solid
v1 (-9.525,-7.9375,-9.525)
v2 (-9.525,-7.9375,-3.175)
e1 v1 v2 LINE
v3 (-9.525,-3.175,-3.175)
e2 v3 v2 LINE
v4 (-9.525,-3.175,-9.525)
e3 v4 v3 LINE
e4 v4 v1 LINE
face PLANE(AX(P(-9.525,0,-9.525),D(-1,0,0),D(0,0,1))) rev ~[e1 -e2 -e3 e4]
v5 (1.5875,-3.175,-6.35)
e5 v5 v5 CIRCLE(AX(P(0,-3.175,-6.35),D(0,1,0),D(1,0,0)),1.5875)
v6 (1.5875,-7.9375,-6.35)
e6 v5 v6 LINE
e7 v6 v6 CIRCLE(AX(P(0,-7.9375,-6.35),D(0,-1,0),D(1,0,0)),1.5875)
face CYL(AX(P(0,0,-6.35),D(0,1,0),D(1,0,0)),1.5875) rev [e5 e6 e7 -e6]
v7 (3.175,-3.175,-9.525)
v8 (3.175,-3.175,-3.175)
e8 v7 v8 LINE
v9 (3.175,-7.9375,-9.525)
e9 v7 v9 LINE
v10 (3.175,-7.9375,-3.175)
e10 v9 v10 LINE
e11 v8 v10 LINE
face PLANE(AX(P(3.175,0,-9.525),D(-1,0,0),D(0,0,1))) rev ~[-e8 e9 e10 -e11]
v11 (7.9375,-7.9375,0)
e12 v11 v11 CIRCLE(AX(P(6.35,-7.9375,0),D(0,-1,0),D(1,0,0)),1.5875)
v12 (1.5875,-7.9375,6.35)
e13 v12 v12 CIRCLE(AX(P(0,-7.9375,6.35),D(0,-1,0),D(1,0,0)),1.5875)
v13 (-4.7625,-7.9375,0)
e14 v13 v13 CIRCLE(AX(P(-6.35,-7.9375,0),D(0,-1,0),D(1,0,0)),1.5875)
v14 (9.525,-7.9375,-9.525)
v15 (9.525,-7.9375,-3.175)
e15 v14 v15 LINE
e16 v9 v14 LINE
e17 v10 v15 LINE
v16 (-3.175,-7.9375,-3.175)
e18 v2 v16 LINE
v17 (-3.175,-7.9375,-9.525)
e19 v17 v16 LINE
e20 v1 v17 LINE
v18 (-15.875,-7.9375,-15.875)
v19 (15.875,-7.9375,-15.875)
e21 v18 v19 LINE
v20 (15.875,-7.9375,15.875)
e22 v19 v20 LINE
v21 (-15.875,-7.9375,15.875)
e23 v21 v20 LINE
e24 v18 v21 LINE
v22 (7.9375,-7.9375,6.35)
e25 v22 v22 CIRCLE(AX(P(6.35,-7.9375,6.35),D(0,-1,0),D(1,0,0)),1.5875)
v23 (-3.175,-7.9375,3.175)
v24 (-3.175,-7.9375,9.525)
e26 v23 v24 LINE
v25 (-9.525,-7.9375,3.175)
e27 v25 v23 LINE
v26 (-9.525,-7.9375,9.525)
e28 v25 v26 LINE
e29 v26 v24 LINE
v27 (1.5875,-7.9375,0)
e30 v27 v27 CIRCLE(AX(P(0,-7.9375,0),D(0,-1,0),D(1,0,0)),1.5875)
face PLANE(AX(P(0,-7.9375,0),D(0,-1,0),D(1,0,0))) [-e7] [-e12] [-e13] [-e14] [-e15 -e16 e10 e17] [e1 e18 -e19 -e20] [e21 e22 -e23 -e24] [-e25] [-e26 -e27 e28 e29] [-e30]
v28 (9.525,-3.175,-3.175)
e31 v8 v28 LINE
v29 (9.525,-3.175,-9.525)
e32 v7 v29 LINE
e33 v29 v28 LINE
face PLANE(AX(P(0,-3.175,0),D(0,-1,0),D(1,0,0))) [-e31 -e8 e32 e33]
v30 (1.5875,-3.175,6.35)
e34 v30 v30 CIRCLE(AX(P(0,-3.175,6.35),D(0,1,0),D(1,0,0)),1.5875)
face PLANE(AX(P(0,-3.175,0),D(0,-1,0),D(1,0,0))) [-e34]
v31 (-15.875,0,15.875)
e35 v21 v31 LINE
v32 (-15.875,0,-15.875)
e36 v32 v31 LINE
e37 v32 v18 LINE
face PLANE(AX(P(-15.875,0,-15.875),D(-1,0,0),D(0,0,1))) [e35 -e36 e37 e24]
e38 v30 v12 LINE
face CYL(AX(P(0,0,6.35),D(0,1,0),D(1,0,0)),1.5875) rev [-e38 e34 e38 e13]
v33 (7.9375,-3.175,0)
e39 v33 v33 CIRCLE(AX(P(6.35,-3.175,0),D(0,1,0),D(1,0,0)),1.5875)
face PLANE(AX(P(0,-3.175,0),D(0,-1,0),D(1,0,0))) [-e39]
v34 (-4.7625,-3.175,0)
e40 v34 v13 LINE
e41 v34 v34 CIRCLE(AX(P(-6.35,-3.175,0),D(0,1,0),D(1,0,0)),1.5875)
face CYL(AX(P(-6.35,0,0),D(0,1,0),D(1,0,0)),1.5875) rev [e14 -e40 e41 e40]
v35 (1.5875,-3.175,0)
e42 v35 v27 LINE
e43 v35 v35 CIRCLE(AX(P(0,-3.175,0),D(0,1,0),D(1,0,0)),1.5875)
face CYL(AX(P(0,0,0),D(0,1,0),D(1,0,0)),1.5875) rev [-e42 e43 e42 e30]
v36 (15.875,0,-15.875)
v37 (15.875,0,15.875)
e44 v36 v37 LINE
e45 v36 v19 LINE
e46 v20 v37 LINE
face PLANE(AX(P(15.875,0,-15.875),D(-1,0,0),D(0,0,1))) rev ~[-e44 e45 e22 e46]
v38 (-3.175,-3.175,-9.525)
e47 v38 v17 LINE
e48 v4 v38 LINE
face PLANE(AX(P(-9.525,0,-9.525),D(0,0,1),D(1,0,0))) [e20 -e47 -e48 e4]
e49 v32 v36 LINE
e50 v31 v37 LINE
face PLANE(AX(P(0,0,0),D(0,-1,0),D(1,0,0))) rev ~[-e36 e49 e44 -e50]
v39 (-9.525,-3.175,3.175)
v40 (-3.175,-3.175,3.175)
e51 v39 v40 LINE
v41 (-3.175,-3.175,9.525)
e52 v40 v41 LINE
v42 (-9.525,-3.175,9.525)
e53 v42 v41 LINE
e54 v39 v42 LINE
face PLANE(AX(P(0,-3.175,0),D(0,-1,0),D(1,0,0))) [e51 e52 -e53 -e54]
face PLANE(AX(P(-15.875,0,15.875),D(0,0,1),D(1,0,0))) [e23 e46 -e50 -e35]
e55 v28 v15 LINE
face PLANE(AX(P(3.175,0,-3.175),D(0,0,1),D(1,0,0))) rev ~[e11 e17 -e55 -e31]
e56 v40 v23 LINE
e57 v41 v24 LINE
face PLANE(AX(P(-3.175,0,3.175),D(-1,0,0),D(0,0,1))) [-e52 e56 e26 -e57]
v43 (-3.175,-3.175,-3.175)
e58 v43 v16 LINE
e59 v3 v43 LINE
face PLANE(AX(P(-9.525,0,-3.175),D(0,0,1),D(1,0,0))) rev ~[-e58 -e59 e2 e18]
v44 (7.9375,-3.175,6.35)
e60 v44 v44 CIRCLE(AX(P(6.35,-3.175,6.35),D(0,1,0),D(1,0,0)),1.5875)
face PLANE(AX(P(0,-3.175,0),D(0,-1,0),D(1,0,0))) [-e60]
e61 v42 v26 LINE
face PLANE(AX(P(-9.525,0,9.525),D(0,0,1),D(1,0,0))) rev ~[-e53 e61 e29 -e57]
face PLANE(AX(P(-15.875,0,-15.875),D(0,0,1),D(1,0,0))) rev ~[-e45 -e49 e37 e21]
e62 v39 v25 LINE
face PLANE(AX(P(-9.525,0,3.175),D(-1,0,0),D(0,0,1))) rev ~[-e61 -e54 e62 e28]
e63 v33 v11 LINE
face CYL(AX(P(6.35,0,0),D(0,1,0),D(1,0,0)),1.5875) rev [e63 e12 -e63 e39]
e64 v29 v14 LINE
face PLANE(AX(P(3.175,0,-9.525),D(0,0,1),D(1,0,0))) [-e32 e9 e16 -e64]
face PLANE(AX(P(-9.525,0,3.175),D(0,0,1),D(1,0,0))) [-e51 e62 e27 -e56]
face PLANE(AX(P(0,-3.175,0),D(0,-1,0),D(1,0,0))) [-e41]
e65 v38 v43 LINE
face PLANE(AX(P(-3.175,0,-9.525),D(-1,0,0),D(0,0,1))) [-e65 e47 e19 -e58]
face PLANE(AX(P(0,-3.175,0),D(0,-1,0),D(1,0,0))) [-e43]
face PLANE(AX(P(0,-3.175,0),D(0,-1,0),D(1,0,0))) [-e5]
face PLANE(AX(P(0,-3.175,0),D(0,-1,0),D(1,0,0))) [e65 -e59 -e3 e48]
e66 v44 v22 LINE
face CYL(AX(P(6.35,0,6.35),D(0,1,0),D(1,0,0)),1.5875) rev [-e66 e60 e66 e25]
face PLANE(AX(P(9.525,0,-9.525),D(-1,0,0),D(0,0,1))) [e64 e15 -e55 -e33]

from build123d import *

# Parameters (mm, degrees)
F0_W     = 31.75
F0_H     = 31.75
F0_W_2   = 6.35
F0_H_2   = 6.35
F0_R     = 1.5875
F1_DEPTH = 7.9375
F2_DEPTH = 3.175


# Not quite as in the source:
# - a length typed as a fraction of an inch, garbled in the dataset ("3 / 203.2 mm" for 3/8 in), is restored


with BuildPart() as f1:
    # F0 (on Front) → F1 (new body)
    with BuildSketch(Plane.XZ):
        Rectangle(F0_W, F0_H)
        with Locations((-6.35, -6.35)):
            Rectangle(F0_W_2, F0_H_2, mode=Mode.SUBTRACT)
        with Locations((0, -6.35)):
            Circle(F0_R, mode=Mode.SUBTRACT)
        with Locations((6.35, -6.35)):
            Rectangle(F0_W_2, F0_H_2, mode=Mode.SUBTRACT)
        with Locations((-6.35, 0)):
            Circle(F0_R, mode=Mode.SUBTRACT)
        with Locations((-6.35, 6.35)):
            Rectangle(F0_W_2, F0_H_2, mode=Mode.SUBTRACT)
        Circle(F0_R, mode=Mode.SUBTRACT)
        with Locations((6.35, 0)):
            Circle(F0_R, mode=Mode.SUBTRACT)
        with Locations((0, 6.35)):
            Circle(F0_R, mode=Mode.SUBTRACT)
        with Locations((6.35, 6.35)):
            Circle(F0_R, mode=Mode.SUBTRACT)
    extrude(amount=F1_DEPTH)

    # F0 (on Front) → F2 (join)
    with BuildSketch(Plane.XZ):
        Rectangle(F0_W, F0_H)
        with Locations((-6.35, -6.35)):
            Rectangle(F0_W_2, F0_H_2, mode=Mode.SUBTRACT)
        with Locations((0, -6.35)):
            Circle(F0_R, mode=Mode.SUBTRACT)
        with Locations((6.35, -6.35)):
            Rectangle(F0_W_2, F0_H_2, mode=Mode.SUBTRACT)
        with Locations((-6.35, 0)):
            Circle(F0_R, mode=Mode.SUBTRACT)
        with Locations((-6.35, 6.35)):
            Rectangle(F0_W_2, F0_H_2, mode=Mode.SUBTRACT)
        Circle(F0_R, mode=Mode.SUBTRACT)
        with Locations((6.35, 0)):
            Circle(F0_R, mode=Mode.SUBTRACT)
        with Locations((0, 6.35)):
            Circle(F0_R, mode=Mode.SUBTRACT)
        with Locations((6.35, 6.35)):
            Circle(F0_R, mode=Mode.SUBTRACT)
        with Locations((6.35, -6.35)):
            Rectangle(F0_W_2, F0_H_2)
        with Locations((-6.35, -6.35)):
            Rectangle(F0_W_2, F0_H_2)
        with Locations((-6.35, 6.35)):
            Rectangle(F0_W_2, F0_H_2)
        with Locations((-6.35, 0)):
            Circle(F0_R)
        Circle(F0_R)
        with Locations((0, -6.35)):
            Circle(F0_R)
        with Locations((6.35, 0)):
            Circle(F0_R)
        with Locations((6.35, 6.35)):
            Circle(F0_R)
        with Locations((0, 6.35)):
            Circle(F0_R)
    extrude(amount=F2_DEPTH)


solid = f1.part
